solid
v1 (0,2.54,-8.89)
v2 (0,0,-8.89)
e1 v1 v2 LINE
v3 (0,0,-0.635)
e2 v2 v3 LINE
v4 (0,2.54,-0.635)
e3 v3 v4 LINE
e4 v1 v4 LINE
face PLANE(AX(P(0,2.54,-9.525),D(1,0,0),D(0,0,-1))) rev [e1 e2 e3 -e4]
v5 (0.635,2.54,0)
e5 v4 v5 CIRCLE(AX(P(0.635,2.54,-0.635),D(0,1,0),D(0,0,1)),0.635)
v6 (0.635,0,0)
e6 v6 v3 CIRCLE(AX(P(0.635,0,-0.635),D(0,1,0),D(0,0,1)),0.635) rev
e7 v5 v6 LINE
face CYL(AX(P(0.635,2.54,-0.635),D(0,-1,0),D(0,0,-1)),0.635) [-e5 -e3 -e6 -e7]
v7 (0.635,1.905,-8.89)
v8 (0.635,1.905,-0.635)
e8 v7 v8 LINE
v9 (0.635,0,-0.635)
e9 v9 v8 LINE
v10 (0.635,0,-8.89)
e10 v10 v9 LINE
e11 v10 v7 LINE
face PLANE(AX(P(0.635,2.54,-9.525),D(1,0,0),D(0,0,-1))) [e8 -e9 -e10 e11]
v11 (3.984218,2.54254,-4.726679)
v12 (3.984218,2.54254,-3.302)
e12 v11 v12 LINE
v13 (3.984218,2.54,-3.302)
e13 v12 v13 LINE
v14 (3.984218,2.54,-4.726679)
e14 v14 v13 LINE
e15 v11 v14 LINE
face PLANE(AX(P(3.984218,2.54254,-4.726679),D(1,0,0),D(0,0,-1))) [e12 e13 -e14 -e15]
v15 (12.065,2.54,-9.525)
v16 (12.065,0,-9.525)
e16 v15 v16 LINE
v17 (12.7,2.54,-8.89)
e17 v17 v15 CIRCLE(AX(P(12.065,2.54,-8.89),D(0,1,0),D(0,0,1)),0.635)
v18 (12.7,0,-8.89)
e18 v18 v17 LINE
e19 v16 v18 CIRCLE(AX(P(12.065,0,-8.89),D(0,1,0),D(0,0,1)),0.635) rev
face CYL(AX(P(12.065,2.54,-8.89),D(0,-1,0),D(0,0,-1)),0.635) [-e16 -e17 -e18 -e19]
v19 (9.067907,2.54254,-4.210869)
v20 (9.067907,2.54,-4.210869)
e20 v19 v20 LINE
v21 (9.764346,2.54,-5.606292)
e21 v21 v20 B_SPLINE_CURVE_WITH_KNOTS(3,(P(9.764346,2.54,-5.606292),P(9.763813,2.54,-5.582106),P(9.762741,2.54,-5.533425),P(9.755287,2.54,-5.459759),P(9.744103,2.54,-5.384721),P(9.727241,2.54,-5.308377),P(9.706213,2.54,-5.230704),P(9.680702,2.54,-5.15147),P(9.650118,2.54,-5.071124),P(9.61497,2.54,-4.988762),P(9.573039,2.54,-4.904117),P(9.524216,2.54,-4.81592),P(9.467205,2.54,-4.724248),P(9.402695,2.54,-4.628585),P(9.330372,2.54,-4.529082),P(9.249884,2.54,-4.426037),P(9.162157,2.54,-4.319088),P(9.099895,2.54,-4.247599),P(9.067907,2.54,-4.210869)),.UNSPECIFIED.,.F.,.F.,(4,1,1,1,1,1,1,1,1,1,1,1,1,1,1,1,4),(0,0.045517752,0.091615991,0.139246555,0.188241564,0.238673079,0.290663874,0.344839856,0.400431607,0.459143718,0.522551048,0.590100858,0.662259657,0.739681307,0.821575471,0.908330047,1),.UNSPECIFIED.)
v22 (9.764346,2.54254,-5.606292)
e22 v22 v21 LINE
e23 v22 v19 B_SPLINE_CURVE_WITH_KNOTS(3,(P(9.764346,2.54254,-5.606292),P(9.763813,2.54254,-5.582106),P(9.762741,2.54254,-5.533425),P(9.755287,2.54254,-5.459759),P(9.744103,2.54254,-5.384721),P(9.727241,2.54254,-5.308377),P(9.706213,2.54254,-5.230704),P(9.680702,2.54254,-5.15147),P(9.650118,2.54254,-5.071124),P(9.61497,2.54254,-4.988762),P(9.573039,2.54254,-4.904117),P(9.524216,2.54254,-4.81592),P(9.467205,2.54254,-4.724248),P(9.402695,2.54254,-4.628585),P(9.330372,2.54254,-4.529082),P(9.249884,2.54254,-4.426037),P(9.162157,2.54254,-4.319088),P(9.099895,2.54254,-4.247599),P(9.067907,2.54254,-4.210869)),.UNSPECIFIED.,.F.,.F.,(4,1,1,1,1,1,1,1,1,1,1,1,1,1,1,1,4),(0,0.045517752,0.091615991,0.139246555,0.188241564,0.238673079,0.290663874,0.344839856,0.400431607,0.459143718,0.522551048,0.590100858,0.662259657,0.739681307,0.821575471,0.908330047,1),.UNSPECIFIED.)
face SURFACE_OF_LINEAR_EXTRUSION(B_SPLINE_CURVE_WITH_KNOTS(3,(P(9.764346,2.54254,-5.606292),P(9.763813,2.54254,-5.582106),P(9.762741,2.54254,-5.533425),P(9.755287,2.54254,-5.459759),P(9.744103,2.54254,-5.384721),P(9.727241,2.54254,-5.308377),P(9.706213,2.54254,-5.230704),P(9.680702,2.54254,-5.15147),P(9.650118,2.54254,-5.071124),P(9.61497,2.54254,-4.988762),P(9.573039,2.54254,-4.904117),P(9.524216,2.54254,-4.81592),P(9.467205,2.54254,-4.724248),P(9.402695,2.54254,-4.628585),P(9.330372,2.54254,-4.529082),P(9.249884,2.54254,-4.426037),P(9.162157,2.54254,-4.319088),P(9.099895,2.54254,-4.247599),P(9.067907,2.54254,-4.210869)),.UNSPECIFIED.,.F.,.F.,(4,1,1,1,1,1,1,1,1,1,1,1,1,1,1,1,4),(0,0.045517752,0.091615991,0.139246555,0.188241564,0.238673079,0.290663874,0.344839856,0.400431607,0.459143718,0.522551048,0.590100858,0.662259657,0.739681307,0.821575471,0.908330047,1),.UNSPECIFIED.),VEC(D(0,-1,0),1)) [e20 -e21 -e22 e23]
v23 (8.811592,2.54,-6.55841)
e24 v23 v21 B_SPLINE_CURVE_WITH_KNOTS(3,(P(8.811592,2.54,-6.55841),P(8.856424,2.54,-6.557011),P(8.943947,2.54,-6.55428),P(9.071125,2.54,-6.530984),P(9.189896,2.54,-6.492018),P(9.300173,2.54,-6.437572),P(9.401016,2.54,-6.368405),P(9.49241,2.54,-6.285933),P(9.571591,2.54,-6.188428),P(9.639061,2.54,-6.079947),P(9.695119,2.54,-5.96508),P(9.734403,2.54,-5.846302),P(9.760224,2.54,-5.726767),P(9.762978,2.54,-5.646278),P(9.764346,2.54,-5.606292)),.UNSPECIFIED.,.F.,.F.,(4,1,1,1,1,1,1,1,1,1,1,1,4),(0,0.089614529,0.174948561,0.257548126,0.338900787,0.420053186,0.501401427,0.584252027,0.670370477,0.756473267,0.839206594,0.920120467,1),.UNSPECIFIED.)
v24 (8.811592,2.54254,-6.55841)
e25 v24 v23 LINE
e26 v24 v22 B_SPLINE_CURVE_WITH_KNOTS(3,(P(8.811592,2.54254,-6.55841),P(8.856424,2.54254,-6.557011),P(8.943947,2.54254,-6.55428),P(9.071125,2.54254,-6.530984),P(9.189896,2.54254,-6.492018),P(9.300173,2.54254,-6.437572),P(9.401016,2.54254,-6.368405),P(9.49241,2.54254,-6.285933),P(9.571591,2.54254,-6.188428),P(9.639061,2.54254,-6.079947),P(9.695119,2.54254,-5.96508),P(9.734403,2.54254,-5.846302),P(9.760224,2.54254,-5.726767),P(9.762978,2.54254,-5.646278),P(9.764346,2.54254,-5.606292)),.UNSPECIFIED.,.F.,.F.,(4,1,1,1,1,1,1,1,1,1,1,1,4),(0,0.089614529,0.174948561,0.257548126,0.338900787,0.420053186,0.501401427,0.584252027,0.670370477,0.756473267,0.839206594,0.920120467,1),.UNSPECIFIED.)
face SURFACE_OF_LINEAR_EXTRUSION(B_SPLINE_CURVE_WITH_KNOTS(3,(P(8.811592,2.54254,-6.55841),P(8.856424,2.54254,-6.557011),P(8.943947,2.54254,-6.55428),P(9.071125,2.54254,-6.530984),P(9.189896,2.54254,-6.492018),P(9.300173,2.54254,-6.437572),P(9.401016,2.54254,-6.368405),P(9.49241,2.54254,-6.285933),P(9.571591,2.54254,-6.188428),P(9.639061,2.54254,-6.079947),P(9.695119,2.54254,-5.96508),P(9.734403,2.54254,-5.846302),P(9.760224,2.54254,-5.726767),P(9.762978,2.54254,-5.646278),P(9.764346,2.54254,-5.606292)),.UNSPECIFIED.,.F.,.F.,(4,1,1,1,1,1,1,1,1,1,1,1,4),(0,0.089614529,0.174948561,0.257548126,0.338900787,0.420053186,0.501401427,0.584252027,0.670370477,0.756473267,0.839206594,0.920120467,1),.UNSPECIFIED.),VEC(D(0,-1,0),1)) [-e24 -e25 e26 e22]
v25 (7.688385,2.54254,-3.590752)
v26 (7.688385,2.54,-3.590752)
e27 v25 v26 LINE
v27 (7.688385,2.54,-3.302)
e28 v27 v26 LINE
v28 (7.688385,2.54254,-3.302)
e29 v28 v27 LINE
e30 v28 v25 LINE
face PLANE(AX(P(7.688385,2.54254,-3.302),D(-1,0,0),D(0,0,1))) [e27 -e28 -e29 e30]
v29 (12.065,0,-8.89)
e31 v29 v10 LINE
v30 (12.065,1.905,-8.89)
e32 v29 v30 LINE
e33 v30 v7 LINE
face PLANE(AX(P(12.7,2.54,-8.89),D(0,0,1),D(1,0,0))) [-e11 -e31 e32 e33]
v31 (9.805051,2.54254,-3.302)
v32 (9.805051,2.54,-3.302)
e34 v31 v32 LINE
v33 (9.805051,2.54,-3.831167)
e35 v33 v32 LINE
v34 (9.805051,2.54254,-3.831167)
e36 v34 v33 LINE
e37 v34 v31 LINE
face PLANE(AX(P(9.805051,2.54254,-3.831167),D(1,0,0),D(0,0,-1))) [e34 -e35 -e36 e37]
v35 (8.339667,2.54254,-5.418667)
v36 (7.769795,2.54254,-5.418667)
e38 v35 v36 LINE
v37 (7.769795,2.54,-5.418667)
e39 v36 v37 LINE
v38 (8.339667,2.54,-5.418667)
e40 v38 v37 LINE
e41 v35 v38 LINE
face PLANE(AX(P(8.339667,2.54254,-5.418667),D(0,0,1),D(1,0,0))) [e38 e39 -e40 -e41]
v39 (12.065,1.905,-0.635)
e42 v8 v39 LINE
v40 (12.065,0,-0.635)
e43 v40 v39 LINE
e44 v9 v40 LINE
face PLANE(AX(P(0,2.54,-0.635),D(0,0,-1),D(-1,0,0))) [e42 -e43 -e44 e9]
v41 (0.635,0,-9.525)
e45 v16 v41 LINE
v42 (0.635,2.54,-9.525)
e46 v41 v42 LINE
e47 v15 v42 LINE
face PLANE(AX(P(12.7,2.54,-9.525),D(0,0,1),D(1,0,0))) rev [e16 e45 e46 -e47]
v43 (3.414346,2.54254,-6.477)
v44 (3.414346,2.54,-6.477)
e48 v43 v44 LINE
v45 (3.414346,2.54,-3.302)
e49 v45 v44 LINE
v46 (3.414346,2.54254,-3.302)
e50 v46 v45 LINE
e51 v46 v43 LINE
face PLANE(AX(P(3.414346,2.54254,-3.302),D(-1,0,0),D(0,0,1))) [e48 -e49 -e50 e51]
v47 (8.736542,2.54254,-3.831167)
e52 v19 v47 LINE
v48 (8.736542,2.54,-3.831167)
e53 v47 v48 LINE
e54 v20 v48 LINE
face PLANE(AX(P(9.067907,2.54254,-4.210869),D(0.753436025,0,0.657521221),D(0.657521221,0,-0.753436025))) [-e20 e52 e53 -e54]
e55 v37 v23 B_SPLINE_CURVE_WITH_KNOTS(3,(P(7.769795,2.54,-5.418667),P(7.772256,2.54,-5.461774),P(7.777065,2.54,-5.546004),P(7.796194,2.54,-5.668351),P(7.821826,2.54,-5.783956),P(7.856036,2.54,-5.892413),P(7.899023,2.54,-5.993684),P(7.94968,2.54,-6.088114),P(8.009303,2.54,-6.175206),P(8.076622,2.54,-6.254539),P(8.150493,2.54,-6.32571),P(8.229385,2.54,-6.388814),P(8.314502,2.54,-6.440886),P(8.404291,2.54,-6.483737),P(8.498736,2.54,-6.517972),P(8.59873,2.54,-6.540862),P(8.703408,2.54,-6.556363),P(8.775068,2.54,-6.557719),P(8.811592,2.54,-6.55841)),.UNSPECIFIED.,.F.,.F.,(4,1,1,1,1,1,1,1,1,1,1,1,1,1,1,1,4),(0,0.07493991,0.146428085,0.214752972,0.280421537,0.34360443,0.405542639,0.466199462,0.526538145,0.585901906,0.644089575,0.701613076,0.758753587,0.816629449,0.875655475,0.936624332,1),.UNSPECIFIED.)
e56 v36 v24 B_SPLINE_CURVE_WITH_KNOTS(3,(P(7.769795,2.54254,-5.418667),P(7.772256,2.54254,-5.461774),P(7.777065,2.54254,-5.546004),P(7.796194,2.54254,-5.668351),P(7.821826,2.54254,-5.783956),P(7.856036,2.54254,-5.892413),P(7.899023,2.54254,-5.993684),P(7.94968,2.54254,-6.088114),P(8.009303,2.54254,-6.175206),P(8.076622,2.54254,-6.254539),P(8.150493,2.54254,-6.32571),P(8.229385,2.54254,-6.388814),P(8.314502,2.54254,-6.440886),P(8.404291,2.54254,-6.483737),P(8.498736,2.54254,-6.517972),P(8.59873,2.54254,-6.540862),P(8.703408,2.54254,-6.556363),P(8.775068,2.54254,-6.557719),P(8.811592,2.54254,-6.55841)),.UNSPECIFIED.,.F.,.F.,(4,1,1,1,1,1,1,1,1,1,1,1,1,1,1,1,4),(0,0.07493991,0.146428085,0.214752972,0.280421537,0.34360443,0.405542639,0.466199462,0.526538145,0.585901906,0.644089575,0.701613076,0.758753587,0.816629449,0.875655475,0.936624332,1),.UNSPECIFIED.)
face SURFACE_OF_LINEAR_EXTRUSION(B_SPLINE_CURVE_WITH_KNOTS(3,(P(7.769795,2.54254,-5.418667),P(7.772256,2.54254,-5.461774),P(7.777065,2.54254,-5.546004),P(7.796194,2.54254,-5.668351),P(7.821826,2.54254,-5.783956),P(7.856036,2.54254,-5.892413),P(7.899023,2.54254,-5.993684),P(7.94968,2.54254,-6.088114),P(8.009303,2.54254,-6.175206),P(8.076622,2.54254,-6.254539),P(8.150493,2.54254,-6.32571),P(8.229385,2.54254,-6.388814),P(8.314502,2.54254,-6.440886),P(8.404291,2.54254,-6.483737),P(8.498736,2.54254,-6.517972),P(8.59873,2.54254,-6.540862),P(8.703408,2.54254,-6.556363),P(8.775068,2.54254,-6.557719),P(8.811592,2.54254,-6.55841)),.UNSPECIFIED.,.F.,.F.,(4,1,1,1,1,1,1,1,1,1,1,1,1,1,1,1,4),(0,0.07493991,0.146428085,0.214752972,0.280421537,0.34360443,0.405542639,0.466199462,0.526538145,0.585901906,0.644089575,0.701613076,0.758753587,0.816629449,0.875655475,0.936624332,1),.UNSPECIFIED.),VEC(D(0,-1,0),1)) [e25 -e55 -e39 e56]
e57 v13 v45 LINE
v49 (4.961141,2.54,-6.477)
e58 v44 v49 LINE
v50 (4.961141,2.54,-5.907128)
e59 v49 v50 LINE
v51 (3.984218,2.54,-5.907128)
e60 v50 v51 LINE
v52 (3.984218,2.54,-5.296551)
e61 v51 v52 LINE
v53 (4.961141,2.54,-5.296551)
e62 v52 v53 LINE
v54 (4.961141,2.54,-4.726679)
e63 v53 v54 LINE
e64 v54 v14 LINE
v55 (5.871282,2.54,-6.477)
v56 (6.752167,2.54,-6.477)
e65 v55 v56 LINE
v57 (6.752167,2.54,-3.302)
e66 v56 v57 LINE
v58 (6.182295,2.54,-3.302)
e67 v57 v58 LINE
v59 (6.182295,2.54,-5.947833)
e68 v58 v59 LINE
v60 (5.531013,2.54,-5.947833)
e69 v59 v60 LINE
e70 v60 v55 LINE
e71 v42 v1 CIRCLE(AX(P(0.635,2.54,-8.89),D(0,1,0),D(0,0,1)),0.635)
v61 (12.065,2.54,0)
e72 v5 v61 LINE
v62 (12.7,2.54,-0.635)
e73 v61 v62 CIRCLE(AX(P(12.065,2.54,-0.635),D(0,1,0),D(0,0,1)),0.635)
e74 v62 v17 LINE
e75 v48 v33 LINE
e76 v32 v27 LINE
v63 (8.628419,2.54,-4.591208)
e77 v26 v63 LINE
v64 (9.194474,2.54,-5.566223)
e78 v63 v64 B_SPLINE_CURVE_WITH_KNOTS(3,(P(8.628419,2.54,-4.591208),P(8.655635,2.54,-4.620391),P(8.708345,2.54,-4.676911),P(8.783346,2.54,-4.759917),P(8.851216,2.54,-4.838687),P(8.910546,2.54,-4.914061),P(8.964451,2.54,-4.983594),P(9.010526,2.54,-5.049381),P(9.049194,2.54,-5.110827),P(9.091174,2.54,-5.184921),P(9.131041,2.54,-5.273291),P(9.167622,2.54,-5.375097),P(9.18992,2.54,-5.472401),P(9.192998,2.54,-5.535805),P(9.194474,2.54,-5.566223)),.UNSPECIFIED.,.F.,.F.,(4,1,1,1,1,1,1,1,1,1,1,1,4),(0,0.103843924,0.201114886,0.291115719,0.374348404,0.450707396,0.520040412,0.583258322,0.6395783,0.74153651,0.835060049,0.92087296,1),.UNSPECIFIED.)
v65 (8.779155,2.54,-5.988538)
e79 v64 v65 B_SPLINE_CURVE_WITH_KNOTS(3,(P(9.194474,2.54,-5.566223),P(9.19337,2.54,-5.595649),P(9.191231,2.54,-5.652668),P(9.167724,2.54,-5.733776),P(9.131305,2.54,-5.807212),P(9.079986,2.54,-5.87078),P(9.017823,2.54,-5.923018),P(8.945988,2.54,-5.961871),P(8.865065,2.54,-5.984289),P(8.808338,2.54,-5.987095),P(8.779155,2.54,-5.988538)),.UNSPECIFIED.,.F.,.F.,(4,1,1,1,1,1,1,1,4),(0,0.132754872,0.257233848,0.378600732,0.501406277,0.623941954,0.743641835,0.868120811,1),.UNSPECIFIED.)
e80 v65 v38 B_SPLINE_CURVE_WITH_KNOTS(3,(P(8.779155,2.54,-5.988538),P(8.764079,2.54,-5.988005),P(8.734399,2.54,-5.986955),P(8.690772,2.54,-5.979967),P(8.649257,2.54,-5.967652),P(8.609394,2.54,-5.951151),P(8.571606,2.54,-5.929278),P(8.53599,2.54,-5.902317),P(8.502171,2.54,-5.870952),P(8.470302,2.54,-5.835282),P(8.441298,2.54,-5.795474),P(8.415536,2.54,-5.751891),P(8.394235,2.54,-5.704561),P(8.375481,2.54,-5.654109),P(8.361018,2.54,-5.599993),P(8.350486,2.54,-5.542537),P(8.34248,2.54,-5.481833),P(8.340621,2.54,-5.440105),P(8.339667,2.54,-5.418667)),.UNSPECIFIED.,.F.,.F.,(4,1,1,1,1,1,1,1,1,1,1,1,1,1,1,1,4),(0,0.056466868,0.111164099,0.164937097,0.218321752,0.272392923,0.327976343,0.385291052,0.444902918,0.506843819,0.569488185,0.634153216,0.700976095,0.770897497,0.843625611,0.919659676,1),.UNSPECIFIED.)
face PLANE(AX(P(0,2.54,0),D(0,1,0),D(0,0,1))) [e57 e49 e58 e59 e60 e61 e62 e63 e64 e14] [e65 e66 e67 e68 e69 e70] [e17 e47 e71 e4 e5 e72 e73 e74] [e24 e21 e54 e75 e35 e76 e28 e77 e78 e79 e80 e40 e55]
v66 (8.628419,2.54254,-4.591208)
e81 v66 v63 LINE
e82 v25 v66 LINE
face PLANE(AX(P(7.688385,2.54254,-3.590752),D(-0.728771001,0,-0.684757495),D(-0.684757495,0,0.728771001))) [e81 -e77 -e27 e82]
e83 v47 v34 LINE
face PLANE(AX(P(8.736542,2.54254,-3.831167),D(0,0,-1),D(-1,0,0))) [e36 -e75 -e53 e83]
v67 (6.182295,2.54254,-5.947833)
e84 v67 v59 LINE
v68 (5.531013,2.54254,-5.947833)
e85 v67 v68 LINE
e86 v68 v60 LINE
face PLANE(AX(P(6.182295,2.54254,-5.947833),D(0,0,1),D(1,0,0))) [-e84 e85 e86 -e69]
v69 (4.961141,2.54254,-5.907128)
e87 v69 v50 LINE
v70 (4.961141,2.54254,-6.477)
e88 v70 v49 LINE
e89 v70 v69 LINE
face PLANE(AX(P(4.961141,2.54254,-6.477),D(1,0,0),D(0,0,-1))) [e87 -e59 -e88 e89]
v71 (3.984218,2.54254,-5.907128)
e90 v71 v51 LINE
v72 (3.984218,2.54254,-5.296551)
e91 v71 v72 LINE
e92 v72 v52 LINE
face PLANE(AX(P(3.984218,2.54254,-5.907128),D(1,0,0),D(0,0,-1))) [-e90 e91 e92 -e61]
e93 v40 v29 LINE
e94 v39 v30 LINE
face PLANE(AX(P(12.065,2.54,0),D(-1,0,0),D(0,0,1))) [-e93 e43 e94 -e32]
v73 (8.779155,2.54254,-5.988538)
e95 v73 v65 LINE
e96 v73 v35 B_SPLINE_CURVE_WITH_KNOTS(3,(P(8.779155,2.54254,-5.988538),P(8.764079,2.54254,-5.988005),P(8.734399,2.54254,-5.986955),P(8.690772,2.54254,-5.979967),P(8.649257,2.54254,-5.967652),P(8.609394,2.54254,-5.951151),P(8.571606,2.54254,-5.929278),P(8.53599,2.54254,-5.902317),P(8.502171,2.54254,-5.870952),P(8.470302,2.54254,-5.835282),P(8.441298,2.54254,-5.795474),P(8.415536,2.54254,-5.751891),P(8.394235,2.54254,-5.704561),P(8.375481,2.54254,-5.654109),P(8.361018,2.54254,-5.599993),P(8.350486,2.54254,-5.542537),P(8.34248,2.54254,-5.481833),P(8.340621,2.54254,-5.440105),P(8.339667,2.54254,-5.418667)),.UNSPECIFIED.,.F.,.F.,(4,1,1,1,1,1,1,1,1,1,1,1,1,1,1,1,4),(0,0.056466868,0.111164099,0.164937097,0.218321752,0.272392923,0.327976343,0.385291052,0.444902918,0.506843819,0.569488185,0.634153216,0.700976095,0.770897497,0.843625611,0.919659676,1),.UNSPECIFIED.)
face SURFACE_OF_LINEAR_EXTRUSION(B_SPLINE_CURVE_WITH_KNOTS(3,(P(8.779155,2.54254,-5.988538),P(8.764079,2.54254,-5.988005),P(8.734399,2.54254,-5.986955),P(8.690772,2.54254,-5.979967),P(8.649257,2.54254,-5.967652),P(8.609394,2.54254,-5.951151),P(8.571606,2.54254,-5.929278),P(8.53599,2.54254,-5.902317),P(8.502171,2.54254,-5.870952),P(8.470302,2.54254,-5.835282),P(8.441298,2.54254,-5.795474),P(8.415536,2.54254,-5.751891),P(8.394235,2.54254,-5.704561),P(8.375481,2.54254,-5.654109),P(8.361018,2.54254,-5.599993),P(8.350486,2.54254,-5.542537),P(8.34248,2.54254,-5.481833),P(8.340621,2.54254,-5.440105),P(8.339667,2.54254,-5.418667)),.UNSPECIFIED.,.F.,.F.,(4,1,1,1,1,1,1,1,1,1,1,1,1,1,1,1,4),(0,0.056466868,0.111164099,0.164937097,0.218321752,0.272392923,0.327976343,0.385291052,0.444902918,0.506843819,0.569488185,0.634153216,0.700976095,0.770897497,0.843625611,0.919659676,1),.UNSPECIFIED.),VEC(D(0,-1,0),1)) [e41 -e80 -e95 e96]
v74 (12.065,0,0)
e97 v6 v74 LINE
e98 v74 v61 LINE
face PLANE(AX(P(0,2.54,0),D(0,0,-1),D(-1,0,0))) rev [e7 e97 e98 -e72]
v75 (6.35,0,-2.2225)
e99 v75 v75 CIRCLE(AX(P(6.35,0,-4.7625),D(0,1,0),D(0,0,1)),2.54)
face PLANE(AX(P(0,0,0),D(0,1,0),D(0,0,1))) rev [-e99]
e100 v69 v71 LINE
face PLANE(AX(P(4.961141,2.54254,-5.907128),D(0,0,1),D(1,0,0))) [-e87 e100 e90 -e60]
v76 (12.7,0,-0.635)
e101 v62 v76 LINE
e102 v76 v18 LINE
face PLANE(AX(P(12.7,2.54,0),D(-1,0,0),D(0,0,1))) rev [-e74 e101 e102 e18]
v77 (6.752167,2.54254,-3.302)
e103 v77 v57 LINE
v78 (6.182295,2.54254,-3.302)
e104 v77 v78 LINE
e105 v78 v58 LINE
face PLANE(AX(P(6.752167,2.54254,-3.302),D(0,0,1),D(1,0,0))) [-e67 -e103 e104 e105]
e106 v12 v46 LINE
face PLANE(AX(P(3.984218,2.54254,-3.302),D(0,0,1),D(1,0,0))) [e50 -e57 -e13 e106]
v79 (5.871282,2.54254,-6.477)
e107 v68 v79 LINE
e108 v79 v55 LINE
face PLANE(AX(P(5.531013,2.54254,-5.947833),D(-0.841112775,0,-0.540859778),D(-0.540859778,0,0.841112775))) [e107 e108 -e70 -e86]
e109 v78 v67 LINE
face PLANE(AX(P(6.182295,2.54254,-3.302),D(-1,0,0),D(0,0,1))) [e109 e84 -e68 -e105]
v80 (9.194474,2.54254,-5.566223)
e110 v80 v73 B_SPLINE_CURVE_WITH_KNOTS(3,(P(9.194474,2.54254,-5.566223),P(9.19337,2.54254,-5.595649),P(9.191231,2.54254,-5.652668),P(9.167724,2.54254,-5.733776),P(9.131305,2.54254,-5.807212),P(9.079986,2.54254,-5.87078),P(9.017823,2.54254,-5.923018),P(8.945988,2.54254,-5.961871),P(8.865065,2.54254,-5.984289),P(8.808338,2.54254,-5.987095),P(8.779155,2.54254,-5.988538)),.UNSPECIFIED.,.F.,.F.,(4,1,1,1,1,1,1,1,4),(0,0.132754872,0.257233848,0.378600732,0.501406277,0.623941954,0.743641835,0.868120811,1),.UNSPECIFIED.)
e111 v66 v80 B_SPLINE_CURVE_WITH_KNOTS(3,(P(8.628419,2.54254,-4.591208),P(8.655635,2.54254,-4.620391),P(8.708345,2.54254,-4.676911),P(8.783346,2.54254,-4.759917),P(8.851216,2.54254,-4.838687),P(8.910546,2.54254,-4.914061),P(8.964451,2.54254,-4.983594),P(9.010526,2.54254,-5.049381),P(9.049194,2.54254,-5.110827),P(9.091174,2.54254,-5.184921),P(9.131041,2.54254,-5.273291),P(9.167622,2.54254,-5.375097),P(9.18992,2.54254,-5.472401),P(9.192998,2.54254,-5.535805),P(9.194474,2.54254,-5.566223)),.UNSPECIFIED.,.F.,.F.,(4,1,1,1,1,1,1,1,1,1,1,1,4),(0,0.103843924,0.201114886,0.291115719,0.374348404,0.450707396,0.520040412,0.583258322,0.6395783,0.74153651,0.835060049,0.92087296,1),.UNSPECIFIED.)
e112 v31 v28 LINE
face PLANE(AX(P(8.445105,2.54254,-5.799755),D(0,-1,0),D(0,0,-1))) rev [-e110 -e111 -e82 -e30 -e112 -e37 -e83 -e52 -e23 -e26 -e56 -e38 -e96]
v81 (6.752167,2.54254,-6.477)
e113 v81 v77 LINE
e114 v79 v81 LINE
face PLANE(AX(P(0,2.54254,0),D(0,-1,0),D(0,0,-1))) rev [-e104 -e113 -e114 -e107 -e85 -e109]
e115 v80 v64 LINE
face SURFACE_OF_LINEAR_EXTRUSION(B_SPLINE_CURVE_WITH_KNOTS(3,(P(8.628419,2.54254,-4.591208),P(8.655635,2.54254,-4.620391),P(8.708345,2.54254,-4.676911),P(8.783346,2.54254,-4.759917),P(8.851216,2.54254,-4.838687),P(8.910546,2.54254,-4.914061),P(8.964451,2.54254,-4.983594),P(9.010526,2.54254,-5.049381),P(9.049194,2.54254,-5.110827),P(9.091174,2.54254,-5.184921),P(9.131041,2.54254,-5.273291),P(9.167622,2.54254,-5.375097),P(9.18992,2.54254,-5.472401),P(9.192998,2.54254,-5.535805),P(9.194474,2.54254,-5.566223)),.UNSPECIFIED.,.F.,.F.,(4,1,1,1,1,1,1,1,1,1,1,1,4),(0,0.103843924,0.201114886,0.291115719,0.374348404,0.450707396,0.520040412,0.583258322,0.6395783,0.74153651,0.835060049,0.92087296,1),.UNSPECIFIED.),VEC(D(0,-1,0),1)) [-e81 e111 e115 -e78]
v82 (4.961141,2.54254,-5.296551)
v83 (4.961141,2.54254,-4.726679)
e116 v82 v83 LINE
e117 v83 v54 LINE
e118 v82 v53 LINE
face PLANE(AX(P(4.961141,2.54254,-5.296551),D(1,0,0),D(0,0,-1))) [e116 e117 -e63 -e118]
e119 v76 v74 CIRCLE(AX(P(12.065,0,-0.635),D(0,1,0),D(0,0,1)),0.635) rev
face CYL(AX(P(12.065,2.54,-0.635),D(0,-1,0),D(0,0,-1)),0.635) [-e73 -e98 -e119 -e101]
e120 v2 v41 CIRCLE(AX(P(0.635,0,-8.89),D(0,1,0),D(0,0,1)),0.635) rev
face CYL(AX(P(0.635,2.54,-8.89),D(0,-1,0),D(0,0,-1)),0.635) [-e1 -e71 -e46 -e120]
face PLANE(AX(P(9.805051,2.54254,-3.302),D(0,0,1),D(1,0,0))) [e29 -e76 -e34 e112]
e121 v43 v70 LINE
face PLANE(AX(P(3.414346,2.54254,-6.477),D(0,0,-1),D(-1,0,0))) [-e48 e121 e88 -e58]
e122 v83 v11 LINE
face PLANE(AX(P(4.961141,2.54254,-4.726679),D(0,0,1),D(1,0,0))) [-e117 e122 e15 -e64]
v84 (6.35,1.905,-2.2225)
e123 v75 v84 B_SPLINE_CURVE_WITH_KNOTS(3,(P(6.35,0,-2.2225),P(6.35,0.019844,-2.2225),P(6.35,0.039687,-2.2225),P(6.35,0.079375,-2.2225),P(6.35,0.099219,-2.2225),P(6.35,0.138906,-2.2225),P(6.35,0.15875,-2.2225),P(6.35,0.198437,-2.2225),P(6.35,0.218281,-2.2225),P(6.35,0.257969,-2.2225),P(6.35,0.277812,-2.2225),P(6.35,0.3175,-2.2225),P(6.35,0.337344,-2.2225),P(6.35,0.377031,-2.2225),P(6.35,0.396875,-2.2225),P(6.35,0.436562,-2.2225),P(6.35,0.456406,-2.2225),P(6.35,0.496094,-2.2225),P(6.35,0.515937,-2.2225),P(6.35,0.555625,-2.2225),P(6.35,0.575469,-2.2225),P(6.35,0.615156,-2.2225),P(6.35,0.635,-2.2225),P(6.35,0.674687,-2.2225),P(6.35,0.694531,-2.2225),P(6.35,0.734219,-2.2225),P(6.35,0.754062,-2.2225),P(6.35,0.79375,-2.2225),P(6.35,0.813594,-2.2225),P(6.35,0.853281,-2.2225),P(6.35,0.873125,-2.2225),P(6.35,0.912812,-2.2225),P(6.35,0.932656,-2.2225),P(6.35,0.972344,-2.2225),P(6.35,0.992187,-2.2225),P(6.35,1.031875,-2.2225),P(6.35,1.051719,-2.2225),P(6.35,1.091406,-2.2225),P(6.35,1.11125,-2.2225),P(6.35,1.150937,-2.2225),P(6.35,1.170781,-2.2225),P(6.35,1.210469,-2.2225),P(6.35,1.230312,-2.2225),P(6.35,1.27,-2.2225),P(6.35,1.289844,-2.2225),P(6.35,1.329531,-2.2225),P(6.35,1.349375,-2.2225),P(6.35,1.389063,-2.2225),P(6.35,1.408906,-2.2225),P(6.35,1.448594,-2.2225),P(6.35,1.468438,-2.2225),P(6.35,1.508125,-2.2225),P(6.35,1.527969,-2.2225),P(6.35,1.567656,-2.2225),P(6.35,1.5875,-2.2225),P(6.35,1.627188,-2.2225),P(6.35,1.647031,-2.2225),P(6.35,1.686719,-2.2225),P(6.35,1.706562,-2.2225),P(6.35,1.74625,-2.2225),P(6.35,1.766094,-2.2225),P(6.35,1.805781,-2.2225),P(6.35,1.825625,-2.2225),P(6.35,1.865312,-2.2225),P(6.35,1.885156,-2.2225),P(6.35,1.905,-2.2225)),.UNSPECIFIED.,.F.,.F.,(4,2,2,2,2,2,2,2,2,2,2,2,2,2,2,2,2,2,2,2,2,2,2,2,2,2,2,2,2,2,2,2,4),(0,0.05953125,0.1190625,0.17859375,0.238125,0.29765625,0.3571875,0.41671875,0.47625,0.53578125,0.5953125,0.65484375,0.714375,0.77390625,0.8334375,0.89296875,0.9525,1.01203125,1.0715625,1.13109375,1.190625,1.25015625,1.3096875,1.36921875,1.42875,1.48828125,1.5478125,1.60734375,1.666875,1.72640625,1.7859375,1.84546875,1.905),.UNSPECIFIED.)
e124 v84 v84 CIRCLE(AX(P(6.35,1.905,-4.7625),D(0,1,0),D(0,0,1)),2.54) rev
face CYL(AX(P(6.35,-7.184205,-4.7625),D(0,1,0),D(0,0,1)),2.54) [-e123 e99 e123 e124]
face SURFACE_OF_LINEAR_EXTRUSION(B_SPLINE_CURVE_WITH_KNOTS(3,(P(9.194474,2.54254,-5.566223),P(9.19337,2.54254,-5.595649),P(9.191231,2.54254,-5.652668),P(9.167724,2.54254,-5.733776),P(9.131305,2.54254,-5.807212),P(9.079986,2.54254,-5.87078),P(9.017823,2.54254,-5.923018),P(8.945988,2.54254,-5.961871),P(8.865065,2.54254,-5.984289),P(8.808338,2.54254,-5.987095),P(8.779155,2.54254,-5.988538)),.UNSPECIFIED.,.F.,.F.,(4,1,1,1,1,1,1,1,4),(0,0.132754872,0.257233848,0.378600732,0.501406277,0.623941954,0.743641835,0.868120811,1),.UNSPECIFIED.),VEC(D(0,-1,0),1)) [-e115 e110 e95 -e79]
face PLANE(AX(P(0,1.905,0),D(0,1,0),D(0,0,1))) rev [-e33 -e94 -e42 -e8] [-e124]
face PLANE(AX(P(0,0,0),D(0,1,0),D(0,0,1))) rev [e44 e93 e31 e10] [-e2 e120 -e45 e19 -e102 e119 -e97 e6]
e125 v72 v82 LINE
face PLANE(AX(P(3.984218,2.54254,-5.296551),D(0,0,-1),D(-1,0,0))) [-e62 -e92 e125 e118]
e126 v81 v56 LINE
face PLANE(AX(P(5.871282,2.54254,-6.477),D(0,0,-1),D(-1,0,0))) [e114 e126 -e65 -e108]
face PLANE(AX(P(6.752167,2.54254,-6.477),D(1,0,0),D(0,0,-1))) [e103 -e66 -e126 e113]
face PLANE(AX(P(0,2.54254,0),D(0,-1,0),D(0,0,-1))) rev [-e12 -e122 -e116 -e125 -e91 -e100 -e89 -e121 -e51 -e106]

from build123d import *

# Parameters (mm, degrees)
SKETCH1_W           = 12.7
SKETCH1_H           = 9.525
BOSS_EXTRUDE1_DEPTH = 2.54
FILLET1_R           = 0.635
SHELL1_START        = 0.635
SHELL1_OUTLINE_W    = 1.905
SHELL1_OUTLINE_H    = 8.255
SHELL1_DEPTH        = 11.43
SKETCH2_R           = 2.54
BOSS_EXTRUDE2_DEPTH = 1.905
BOSS_EXTRUDE3_DEPTH = 0.00254


# Read off the part's stored shape, not the designer's step: Shell1
with BuildPart() as part:
    # Sketch1 → Boss-Extrude1 (new body)
    with BuildSketch(Plane(origin=(0, 0, 0), x_dir=(1, 0, 0), z_dir=(0, 1, 0))):
        with Locations((6.35, 4.7625)):
            Rectangle(SKETCH1_W, SKETCH1_H)
    extrude(amount=BOSS_EXTRUDE1_DEPTH)

    # Fillet1
    fillet1_edges = [part.edges().sort_by_distance(p)[0] for p in [
        (0, 1.27, -9.525),
        (12.7, 1.27, -9.525),
        (12.7, 1.27, 0),
        (0, 1.27, 0),
    ]]
    fillet(fillet1_edges, radius=FILLET1_R)

    # Shell1 outline → Shell1 (cut)
    with BuildSketch(Plane.YZ.offset(SHELL1_START)):
        with Locations((0.9525, -4.7625)):
            Rectangle(SHELL1_OUTLINE_W, SHELL1_OUTLINE_H)
    extrude(amount=SHELL1_DEPTH, mode=Mode.SUBTRACT)

    # Sketch2 → Boss-Extrude2 (add)
    with BuildSketch(Plane(origin=(0, 1.905, 0), x_dir=(-1, 0, 0), z_dir=(0, -1, 0))):
        with Locations(Location((-6.35, 4.7625, 0), (0, 0, 270))):
            Circle(SKETCH2_R)
    extrude(amount=BOSS_EXTRUDE2_DEPTH)

    # Sketch3 → Boss-Extrude3 (add)
    with BuildSketch(Plane(origin=(0, 2.54, 0), x_dir=(1, 0, 0), z_dir=(0, 1, 0))):
        Polygon((3.414346154, 6.477), (4.961141026, 6.477), (4.961141026, 5.907128205), (3.984217949, 5.907128205), (3.984217949, 5.296551282), (4.961141026, 5.296551282), (4.961141026, 4.726679487), (3.984217949, 4.726679487), (3.984217949, 3.302), (3.414346154, 3.302), align=None)
        Polygon((5.871282252, 6.477), (6.752166667, 6.477), (6.752166667, 3.302), (6.182294872, 3.302), (6.182294872, 5.947833333), (5.531012821, 5.947833333), align=None)
        with BuildLine():
            Line((8.339666667, 5.418666667), (7.769794872, 5.418666667))
            add(Edge.make_bspline(
                [(7.769794872, 5.418666667), (7.772256061, 5.461774453), (7.777065076, 5.54600448), (7.796194123, 5.66835129), (7.82182639, 5.783955572), (7.856036054, 5.89241293), (7.899022734, 5.993683952), (7.949680273, 6.088113879), (8.009302856, 6.175205533), (8.076621518, 6.254538911), (8.150493374, 6.325709616), (8.229384771, 6.388814034), (8.31450246, 6.440886212), (8.404291271, 6.483736794), (8.498735915, 6.517972417), (8.598729985, 6.540861702), (8.70340768, 6.55636255), (8.775068039, 6.557718936), (8.811591747, 6.558410256)],
                knots=[0, 0, 0, 0, 1.199038563, 2.342849363, 3.436047546, 4.486744587, 5.497670872, 6.488682221, 7.459191391, 8.424610317, 9.374430501, 10.305433194, 11.225809216, 12.140057399, 13.06607119, 14.010487599, 14.985989317, 16, 16, 16, 16], degree=3))
            add(Edge.make_bspline(
                [(8.811591747, 6.558410256), (8.85642408, 6.557011369), (8.9439473, 6.554280414), (9.071125482, 6.53098446), (9.189895998, 6.492018376), (9.300172515, 6.437572481), (9.401016227, 6.368404679), (9.492410414, 6.285933395), (9.571591168, 6.188428338), (9.639060519, 6.079946535), (9.695119486, 5.965079574), (9.734403276, 5.846302372), (9.760224087, 5.726766795), (9.762978037, 5.646277588), (9.764346154, 5.606291867)],
                knots=[0, 0, 0, 0, 1.075374347, 2.099382735, 3.09057751, 4.06680945, 5.040638231, 6.016817125, 7.011024321, 8.044445721, 9.0776792, 10.070479129, 11.0414456, 12, 12, 12, 12], degree=3))
            add(Edge.make_bspline(
                [(9.764346154, 5.606291867), (9.763813481, 5.582105677), (9.762741343, 5.53342485), (9.755286624, 5.459758812), (9.744103072, 5.384721339), (9.727241001, 5.308376769), (9.706212616, 5.230703702), (9.680702146, 5.151469689), (9.65011785, 5.071123958), (9.614970118, 4.98876223), (9.573038785, 4.904117111), (9.524215575, 4.815919737), (9.467204612, 4.724248345), (9.402694514, 4.62858533), (9.330371972, 4.529081566), (9.249883932, 4.426036789), (9.162157425, 4.319087904), (9.099895456, 4.247598577), (9.067906851, 4.210869191)],
                knots=[0, 0, 0, 0, 0.728284026, 1.46585585, 2.227944881, 3.01186502, 3.81876927, 4.650621989, 5.517437689, 6.406905708, 7.346299482, 8.360816762, 9.441613733, 10.596154504, 11.834900912, 13.145207542, 14.533280747, 16, 16, 16, 16], degree=3))
            Line((9.067906851, 4.210869191), (8.736541667, 3.831166667))
            Line((8.736541667, 3.831166667), (9.805051282, 3.831166667))
            Line((9.805051282, 3.831166667), (9.805051282, 3.302))
            Line((9.805051282, 3.302), (7.688384615, 3.302))
            Line((7.688384615, 3.302), (7.688384615, 3.590752003))
            Line((7.688384615, 3.590752003), (8.62841867, 4.591207732))
            add(Edge.make_bspline(
                [(8.62841867, 4.591207732), (8.655635071, 4.620391337), (8.70834517, 4.676911324), (8.783346208, 4.759916937), (8.851215523, 4.838687284), (8.910545788, 4.914061108), (8.96445058, 4.983593589), (9.010526288, 5.049380524), (9.049194469, 5.110827174), (9.091174264, 5.184921103), (9.131041269, 5.273291298), (9.167621659, 5.375097387), (9.189919938, 5.47240056), (9.192997806, 5.5358054), (9.194474359, 5.566222756)],
                knots=[0, 0, 0, 0, 1.246127091, 2.413378631, 3.493388633, 4.492180848, 5.408488754, 6.240484944, 6.999099869, 7.674939598, 8.898438119, 10.020720584, 11.050475521, 12, 12, 12, 12], degree=3))
            add(Edge.make_bspline(
                [(9.194474359, 5.566222756), (9.193370376, 5.595649202), (9.191231232, 5.652667658), (9.167723774, 5.733776109), (9.131305205, 5.807211531), (9.079986297, 5.870779591), (9.017823027, 5.923017682), (8.945987529, 5.961870906), (8.865065475, 5.984289038), (8.808337572, 5.987094988), (8.779154848, 5.988538462)],
                knots=[0, 0, 0, 0, 1.062038974, 2.057870785, 3.028805853, 4.01125022, 4.991535629, 5.949134679, 6.94496649, 8, 8, 8, 8], degree=3))
            add(Edge.make_bspline(
                [(8.779154848, 5.988538462), (8.764078681, 5.988005225), (8.734398824, 5.986955463), (8.690771755, 5.979967483), (8.649257465, 5.967651898), (8.609393876, 5.951150747), (8.571606422, 5.929278353), (8.535990417, 5.902317143), (8.5021706, 5.870952262), (8.470302083, 5.835281784), (8.441297572, 5.79547352), (8.415535872, 5.751891037), (8.394235234, 5.704561389), (8.375481378, 5.654109398), (8.361017507, 5.59999317), (8.350486015, 5.542536583), (8.342479625, 5.481833113), (8.340621377, 5.440105185), (8.339666667, 5.418666667)],
                knots=[0, 0, 0, 0, 0.903469896, 1.778625579, 2.63899355, 3.493148037, 4.358286772, 5.247621495, 6.164656832, 7.118446693, 8.109501108, 9.111810964, 10.146451449, 11.215617525, 12.33435995, 13.498009769, 14.714554818, 16, 16, 16, 16], degree=3))
        make_face()
    extrude(amount=BOSS_EXTRUDE3_DEPTH)


solid = part.part
